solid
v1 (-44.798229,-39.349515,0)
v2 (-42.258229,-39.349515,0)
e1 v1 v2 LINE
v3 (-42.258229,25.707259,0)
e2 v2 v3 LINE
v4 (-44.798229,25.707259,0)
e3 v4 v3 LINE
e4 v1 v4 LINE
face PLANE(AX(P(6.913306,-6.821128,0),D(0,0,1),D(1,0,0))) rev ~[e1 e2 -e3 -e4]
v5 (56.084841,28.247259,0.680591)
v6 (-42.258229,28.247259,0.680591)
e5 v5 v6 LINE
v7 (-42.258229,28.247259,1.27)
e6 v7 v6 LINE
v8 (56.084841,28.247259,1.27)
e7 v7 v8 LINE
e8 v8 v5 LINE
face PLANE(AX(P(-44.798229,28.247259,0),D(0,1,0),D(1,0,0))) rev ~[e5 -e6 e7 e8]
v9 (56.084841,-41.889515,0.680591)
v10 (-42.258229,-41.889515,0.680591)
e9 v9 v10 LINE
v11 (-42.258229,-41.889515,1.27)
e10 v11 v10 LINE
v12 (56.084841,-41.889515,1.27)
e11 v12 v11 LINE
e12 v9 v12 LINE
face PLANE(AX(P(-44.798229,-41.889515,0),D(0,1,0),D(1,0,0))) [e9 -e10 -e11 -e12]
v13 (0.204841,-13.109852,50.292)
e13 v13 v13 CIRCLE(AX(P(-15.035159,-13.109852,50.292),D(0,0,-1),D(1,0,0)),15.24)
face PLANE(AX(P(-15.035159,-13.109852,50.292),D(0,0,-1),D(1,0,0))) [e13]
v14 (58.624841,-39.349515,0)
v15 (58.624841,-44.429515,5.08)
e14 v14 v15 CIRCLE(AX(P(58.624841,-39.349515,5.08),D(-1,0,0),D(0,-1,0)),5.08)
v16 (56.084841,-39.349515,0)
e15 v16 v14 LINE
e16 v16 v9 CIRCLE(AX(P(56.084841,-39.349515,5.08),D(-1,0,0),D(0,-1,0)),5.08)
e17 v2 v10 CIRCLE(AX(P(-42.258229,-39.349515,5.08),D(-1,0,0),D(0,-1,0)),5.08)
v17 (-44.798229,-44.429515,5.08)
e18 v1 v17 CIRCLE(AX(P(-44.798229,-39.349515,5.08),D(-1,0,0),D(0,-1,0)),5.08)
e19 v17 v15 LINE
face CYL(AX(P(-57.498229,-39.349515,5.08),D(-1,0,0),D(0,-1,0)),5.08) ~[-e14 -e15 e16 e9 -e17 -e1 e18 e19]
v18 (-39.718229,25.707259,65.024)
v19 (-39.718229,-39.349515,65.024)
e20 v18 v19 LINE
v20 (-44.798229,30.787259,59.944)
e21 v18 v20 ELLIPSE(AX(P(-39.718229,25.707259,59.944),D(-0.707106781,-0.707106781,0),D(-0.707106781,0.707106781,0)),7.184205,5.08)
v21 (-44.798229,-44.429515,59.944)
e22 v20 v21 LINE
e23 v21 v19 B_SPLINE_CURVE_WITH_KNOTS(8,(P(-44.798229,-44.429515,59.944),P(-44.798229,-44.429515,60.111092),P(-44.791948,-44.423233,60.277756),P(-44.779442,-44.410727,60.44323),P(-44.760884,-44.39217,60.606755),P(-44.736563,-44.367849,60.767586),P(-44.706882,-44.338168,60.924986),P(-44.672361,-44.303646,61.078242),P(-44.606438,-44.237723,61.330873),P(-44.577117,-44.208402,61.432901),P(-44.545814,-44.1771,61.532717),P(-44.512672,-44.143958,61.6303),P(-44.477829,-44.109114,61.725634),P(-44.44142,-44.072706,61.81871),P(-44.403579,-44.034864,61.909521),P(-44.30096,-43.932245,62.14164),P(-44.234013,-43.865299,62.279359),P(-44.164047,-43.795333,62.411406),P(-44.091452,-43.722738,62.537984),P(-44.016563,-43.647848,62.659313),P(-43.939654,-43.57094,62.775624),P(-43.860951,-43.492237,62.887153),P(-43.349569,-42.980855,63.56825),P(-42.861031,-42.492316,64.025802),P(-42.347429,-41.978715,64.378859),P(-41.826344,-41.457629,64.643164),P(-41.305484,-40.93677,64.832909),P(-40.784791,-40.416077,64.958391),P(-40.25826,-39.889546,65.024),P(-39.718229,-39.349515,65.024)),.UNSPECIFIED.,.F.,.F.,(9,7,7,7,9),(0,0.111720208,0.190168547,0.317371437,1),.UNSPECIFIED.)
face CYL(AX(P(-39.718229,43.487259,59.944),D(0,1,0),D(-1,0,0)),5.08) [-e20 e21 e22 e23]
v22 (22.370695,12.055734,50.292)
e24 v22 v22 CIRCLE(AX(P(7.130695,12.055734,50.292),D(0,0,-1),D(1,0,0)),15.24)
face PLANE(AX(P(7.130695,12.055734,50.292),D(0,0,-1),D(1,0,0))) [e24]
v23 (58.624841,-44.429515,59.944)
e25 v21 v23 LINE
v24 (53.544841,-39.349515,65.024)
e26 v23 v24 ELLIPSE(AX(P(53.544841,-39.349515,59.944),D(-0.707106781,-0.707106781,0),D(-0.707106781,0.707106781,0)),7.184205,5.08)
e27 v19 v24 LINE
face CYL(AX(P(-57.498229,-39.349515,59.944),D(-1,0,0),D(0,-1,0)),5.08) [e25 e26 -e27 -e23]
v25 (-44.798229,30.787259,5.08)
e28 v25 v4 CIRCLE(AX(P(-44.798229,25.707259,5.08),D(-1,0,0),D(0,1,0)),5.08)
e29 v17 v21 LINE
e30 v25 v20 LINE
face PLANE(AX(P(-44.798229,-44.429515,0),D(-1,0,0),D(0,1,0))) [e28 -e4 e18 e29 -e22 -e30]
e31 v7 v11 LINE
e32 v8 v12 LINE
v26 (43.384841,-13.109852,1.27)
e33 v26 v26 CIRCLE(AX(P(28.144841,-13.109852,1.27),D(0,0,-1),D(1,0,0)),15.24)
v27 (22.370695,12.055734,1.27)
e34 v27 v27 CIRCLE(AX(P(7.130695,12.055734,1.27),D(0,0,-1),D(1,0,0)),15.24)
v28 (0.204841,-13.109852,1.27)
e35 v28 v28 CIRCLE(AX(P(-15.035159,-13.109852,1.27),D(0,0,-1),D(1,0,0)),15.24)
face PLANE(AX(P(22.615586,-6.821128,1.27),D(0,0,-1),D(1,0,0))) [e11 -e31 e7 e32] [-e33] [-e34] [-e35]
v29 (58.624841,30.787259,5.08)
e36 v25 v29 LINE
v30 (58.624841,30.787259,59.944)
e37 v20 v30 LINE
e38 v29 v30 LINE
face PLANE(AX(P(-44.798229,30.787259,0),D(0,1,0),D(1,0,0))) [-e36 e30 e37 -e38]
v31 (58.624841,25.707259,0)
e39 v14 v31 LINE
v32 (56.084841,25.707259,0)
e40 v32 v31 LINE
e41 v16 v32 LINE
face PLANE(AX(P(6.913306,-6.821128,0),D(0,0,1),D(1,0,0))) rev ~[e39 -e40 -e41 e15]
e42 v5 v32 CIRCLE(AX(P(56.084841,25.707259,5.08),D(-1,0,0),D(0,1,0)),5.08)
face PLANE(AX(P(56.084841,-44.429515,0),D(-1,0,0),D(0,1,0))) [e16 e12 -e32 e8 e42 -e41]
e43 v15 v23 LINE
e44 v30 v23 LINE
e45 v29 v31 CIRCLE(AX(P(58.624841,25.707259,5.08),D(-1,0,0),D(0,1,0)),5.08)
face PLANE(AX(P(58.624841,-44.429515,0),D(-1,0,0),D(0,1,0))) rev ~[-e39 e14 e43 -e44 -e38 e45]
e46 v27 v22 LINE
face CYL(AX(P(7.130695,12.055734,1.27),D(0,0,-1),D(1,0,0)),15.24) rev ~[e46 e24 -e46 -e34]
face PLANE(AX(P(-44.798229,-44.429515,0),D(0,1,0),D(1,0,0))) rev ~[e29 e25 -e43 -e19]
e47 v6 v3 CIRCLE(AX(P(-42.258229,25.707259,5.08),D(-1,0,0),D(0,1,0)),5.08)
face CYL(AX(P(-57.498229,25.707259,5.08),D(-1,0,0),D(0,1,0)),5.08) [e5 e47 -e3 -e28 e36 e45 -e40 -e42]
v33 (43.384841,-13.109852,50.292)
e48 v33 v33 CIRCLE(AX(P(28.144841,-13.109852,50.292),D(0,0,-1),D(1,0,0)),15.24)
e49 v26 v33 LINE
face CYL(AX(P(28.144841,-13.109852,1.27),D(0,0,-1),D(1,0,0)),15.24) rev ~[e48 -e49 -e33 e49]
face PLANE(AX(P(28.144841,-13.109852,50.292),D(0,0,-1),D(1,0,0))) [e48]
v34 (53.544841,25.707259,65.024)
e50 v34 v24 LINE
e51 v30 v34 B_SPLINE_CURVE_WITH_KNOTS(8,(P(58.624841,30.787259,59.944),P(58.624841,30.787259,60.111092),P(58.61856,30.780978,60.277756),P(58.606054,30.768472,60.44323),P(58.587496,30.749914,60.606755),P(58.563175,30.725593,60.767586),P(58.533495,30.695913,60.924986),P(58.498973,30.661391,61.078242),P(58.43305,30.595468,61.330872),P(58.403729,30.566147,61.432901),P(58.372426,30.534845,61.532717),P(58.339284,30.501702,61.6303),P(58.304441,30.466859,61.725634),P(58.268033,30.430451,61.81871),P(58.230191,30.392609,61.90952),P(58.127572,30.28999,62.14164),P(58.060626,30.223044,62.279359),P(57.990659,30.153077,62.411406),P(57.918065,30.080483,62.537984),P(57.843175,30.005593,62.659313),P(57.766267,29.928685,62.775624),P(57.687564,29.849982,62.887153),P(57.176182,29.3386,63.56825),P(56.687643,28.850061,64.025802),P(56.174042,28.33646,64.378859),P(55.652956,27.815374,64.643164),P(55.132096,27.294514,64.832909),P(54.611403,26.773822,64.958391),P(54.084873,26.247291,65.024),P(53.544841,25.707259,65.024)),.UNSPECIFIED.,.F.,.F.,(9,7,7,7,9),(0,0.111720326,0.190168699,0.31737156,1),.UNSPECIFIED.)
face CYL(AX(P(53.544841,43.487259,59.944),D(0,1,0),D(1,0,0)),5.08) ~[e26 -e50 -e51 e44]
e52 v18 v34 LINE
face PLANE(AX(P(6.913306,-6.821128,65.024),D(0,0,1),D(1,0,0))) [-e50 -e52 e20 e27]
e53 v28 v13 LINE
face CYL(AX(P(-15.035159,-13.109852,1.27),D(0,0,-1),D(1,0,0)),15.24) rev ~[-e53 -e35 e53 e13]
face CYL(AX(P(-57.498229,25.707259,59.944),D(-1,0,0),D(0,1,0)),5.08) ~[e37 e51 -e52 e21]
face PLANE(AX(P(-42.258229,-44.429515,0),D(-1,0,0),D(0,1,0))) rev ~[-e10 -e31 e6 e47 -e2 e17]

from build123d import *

# Parameters (mm, degrees)
F0_W        = 103.4230701625
F0_H        = 75.2167738974
F1_DEPTH    = 65.024
F2_T        = -2.54
F3_T1_DEPTH = 128.8230701625
F3_T3_DEPTH = 100.6167738974
F4_W        = 31.4045592836
F4_H        = 70.1367738974
F5_DEPTH    = 61.214
F6_R        = 15.24
F7_DEPTH    = 49.022


# Not quite as in the source:
# - a fillet or chamfer that OpenCascade refuses, or shapes differently, is made with other operations: its cross-section is extruded or revolved along the edge and cut away or added


with BuildPart() as f1:
    # F0 (on Top) → F1 (new body)
    with BuildSketch(Plane.XY):
        with Locations((6.9133061916, -6.8211276084)):
            Rectangle(F0_W, F0_H)
    extrude(amount=F1_DEPTH)

    # F2
    f2_openings = [f1.faces().sort_by_distance(p)[0] for p in [
        (6.913306, -6.821128, 0),
    ]]
    offset(amount=F2_T, openings=f2_openings)

    # F3: fillet of radius 5.08 on 6 edges, made by hand

    # F3_s2 → F3_t1 (cut)
    with BuildSketch(Plane.YZ.offset(-57.4982288897)):
        with BuildLine():
            ThreePointArc((-44.4295145571, 59.944), (-42.9416170056, 63.5361024484), (-39.3495145571, 65.024))
            Line((-39.3495145571, 65.024), (-44.4295145571, 65.024))
            Line((-44.4295145571, 65.024), (-44.4295145571, 59.944))
        make_face()
        with BuildLine():
            ThreePointArc((30.7872593403, 59.944), (29.2993617887, 63.5361024484), (25.7072593403, 65.024))
            Line((25.7072593403, 65.024), (30.7872593403, 65.024))
            Line((30.7872593403, 65.024), (30.7872593403, 59.944))
        make_face()
        with BuildLine():
            ThreePointArc((30.7872593403, 5.08), (29.2993617887, 1.4878975516), (25.7072593403, 0))
            Line((25.7072593403, 0), (30.7872593403, 0))
            Line((30.7872593403, 0), (30.7872593403, 5.08))
        make_face()
        with BuildLine():
            ThreePointArc((-44.4295145571, 5.08), (-42.9416170056, 1.4878975516), (-39.3495145571, 0))
            Line((-39.3495145571, 0), (-44.4295145571, 0))
            Line((-44.4295145571, 0), (-44.4295145571, 5.08))
        make_face()
    extrude(amount=F3_T1_DEPTH, mode=Mode.SUBTRACT)

    # F3_s4 → F3_t3 (cut)
    with BuildSketch(Plane.XZ.offset(-43.4872593403)):
        with BuildLine():
            ThreePointArc((-44.7982288897, 59.944), (-43.3103313381, 63.5361024484), (-39.7182288897, 65.024))
            Line((-39.7182288897, 65.024), (-44.7982288897, 65.024))
            Line((-44.7982288897, 65.024), (-44.7982288897, 59.944))
        make_face()
        with BuildLine():
            ThreePointArc((58.6248412728, 59.944), (57.1369437213, 63.5361024484), (53.5448412728, 65.024))
            Line((53.5448412728, 65.024), (58.6248412728, 65.024))
            Line((58.6248412728, 65.024), (58.6248412728, 59.944))
        make_face()
    extrude(amount=F3_T3_DEPTH, mode=Mode.SUBTRACT)

    # F4 (on face) → F5 (join)
    with BuildSketch(Plane(origin=(0, 0, 62.484), x_dir=(1, 0, 0), z_dir=(0, 0, -1))):
        Polygon((24.3728496134, 41.8895145571), (-10.8536696061, 41.8895145571), (-10.8536696061, -28.2472593403), (56.0848412728, -28.2472593403), (56.0848412728, 41.8895145571), align=None)
        with Locations((-26.5559492479, 6.8211276084)):
            Rectangle(F4_W, F4_H)
    extrude(amount=F5_DEPTH)

    # F6 (on face) → F7 (cut)
    with BuildSketch(Plane(origin=(0, 0, 1.27), x_dir=(1, 0, 0), z_dir=(0, 0, -1))):
        with Locations((-15.0351587272, 13.1098517179)):
            Circle(F6_R)
        with Locations((28.1448412728, 13.1098517179)):
            Circle(F6_R)
        with Locations((7.1306948804, -12.0557340983)):
            Circle(F6_R)
    extrude(amount=-F7_DEPTH, mode=Mode.SUBTRACT)


solid = f1.part
